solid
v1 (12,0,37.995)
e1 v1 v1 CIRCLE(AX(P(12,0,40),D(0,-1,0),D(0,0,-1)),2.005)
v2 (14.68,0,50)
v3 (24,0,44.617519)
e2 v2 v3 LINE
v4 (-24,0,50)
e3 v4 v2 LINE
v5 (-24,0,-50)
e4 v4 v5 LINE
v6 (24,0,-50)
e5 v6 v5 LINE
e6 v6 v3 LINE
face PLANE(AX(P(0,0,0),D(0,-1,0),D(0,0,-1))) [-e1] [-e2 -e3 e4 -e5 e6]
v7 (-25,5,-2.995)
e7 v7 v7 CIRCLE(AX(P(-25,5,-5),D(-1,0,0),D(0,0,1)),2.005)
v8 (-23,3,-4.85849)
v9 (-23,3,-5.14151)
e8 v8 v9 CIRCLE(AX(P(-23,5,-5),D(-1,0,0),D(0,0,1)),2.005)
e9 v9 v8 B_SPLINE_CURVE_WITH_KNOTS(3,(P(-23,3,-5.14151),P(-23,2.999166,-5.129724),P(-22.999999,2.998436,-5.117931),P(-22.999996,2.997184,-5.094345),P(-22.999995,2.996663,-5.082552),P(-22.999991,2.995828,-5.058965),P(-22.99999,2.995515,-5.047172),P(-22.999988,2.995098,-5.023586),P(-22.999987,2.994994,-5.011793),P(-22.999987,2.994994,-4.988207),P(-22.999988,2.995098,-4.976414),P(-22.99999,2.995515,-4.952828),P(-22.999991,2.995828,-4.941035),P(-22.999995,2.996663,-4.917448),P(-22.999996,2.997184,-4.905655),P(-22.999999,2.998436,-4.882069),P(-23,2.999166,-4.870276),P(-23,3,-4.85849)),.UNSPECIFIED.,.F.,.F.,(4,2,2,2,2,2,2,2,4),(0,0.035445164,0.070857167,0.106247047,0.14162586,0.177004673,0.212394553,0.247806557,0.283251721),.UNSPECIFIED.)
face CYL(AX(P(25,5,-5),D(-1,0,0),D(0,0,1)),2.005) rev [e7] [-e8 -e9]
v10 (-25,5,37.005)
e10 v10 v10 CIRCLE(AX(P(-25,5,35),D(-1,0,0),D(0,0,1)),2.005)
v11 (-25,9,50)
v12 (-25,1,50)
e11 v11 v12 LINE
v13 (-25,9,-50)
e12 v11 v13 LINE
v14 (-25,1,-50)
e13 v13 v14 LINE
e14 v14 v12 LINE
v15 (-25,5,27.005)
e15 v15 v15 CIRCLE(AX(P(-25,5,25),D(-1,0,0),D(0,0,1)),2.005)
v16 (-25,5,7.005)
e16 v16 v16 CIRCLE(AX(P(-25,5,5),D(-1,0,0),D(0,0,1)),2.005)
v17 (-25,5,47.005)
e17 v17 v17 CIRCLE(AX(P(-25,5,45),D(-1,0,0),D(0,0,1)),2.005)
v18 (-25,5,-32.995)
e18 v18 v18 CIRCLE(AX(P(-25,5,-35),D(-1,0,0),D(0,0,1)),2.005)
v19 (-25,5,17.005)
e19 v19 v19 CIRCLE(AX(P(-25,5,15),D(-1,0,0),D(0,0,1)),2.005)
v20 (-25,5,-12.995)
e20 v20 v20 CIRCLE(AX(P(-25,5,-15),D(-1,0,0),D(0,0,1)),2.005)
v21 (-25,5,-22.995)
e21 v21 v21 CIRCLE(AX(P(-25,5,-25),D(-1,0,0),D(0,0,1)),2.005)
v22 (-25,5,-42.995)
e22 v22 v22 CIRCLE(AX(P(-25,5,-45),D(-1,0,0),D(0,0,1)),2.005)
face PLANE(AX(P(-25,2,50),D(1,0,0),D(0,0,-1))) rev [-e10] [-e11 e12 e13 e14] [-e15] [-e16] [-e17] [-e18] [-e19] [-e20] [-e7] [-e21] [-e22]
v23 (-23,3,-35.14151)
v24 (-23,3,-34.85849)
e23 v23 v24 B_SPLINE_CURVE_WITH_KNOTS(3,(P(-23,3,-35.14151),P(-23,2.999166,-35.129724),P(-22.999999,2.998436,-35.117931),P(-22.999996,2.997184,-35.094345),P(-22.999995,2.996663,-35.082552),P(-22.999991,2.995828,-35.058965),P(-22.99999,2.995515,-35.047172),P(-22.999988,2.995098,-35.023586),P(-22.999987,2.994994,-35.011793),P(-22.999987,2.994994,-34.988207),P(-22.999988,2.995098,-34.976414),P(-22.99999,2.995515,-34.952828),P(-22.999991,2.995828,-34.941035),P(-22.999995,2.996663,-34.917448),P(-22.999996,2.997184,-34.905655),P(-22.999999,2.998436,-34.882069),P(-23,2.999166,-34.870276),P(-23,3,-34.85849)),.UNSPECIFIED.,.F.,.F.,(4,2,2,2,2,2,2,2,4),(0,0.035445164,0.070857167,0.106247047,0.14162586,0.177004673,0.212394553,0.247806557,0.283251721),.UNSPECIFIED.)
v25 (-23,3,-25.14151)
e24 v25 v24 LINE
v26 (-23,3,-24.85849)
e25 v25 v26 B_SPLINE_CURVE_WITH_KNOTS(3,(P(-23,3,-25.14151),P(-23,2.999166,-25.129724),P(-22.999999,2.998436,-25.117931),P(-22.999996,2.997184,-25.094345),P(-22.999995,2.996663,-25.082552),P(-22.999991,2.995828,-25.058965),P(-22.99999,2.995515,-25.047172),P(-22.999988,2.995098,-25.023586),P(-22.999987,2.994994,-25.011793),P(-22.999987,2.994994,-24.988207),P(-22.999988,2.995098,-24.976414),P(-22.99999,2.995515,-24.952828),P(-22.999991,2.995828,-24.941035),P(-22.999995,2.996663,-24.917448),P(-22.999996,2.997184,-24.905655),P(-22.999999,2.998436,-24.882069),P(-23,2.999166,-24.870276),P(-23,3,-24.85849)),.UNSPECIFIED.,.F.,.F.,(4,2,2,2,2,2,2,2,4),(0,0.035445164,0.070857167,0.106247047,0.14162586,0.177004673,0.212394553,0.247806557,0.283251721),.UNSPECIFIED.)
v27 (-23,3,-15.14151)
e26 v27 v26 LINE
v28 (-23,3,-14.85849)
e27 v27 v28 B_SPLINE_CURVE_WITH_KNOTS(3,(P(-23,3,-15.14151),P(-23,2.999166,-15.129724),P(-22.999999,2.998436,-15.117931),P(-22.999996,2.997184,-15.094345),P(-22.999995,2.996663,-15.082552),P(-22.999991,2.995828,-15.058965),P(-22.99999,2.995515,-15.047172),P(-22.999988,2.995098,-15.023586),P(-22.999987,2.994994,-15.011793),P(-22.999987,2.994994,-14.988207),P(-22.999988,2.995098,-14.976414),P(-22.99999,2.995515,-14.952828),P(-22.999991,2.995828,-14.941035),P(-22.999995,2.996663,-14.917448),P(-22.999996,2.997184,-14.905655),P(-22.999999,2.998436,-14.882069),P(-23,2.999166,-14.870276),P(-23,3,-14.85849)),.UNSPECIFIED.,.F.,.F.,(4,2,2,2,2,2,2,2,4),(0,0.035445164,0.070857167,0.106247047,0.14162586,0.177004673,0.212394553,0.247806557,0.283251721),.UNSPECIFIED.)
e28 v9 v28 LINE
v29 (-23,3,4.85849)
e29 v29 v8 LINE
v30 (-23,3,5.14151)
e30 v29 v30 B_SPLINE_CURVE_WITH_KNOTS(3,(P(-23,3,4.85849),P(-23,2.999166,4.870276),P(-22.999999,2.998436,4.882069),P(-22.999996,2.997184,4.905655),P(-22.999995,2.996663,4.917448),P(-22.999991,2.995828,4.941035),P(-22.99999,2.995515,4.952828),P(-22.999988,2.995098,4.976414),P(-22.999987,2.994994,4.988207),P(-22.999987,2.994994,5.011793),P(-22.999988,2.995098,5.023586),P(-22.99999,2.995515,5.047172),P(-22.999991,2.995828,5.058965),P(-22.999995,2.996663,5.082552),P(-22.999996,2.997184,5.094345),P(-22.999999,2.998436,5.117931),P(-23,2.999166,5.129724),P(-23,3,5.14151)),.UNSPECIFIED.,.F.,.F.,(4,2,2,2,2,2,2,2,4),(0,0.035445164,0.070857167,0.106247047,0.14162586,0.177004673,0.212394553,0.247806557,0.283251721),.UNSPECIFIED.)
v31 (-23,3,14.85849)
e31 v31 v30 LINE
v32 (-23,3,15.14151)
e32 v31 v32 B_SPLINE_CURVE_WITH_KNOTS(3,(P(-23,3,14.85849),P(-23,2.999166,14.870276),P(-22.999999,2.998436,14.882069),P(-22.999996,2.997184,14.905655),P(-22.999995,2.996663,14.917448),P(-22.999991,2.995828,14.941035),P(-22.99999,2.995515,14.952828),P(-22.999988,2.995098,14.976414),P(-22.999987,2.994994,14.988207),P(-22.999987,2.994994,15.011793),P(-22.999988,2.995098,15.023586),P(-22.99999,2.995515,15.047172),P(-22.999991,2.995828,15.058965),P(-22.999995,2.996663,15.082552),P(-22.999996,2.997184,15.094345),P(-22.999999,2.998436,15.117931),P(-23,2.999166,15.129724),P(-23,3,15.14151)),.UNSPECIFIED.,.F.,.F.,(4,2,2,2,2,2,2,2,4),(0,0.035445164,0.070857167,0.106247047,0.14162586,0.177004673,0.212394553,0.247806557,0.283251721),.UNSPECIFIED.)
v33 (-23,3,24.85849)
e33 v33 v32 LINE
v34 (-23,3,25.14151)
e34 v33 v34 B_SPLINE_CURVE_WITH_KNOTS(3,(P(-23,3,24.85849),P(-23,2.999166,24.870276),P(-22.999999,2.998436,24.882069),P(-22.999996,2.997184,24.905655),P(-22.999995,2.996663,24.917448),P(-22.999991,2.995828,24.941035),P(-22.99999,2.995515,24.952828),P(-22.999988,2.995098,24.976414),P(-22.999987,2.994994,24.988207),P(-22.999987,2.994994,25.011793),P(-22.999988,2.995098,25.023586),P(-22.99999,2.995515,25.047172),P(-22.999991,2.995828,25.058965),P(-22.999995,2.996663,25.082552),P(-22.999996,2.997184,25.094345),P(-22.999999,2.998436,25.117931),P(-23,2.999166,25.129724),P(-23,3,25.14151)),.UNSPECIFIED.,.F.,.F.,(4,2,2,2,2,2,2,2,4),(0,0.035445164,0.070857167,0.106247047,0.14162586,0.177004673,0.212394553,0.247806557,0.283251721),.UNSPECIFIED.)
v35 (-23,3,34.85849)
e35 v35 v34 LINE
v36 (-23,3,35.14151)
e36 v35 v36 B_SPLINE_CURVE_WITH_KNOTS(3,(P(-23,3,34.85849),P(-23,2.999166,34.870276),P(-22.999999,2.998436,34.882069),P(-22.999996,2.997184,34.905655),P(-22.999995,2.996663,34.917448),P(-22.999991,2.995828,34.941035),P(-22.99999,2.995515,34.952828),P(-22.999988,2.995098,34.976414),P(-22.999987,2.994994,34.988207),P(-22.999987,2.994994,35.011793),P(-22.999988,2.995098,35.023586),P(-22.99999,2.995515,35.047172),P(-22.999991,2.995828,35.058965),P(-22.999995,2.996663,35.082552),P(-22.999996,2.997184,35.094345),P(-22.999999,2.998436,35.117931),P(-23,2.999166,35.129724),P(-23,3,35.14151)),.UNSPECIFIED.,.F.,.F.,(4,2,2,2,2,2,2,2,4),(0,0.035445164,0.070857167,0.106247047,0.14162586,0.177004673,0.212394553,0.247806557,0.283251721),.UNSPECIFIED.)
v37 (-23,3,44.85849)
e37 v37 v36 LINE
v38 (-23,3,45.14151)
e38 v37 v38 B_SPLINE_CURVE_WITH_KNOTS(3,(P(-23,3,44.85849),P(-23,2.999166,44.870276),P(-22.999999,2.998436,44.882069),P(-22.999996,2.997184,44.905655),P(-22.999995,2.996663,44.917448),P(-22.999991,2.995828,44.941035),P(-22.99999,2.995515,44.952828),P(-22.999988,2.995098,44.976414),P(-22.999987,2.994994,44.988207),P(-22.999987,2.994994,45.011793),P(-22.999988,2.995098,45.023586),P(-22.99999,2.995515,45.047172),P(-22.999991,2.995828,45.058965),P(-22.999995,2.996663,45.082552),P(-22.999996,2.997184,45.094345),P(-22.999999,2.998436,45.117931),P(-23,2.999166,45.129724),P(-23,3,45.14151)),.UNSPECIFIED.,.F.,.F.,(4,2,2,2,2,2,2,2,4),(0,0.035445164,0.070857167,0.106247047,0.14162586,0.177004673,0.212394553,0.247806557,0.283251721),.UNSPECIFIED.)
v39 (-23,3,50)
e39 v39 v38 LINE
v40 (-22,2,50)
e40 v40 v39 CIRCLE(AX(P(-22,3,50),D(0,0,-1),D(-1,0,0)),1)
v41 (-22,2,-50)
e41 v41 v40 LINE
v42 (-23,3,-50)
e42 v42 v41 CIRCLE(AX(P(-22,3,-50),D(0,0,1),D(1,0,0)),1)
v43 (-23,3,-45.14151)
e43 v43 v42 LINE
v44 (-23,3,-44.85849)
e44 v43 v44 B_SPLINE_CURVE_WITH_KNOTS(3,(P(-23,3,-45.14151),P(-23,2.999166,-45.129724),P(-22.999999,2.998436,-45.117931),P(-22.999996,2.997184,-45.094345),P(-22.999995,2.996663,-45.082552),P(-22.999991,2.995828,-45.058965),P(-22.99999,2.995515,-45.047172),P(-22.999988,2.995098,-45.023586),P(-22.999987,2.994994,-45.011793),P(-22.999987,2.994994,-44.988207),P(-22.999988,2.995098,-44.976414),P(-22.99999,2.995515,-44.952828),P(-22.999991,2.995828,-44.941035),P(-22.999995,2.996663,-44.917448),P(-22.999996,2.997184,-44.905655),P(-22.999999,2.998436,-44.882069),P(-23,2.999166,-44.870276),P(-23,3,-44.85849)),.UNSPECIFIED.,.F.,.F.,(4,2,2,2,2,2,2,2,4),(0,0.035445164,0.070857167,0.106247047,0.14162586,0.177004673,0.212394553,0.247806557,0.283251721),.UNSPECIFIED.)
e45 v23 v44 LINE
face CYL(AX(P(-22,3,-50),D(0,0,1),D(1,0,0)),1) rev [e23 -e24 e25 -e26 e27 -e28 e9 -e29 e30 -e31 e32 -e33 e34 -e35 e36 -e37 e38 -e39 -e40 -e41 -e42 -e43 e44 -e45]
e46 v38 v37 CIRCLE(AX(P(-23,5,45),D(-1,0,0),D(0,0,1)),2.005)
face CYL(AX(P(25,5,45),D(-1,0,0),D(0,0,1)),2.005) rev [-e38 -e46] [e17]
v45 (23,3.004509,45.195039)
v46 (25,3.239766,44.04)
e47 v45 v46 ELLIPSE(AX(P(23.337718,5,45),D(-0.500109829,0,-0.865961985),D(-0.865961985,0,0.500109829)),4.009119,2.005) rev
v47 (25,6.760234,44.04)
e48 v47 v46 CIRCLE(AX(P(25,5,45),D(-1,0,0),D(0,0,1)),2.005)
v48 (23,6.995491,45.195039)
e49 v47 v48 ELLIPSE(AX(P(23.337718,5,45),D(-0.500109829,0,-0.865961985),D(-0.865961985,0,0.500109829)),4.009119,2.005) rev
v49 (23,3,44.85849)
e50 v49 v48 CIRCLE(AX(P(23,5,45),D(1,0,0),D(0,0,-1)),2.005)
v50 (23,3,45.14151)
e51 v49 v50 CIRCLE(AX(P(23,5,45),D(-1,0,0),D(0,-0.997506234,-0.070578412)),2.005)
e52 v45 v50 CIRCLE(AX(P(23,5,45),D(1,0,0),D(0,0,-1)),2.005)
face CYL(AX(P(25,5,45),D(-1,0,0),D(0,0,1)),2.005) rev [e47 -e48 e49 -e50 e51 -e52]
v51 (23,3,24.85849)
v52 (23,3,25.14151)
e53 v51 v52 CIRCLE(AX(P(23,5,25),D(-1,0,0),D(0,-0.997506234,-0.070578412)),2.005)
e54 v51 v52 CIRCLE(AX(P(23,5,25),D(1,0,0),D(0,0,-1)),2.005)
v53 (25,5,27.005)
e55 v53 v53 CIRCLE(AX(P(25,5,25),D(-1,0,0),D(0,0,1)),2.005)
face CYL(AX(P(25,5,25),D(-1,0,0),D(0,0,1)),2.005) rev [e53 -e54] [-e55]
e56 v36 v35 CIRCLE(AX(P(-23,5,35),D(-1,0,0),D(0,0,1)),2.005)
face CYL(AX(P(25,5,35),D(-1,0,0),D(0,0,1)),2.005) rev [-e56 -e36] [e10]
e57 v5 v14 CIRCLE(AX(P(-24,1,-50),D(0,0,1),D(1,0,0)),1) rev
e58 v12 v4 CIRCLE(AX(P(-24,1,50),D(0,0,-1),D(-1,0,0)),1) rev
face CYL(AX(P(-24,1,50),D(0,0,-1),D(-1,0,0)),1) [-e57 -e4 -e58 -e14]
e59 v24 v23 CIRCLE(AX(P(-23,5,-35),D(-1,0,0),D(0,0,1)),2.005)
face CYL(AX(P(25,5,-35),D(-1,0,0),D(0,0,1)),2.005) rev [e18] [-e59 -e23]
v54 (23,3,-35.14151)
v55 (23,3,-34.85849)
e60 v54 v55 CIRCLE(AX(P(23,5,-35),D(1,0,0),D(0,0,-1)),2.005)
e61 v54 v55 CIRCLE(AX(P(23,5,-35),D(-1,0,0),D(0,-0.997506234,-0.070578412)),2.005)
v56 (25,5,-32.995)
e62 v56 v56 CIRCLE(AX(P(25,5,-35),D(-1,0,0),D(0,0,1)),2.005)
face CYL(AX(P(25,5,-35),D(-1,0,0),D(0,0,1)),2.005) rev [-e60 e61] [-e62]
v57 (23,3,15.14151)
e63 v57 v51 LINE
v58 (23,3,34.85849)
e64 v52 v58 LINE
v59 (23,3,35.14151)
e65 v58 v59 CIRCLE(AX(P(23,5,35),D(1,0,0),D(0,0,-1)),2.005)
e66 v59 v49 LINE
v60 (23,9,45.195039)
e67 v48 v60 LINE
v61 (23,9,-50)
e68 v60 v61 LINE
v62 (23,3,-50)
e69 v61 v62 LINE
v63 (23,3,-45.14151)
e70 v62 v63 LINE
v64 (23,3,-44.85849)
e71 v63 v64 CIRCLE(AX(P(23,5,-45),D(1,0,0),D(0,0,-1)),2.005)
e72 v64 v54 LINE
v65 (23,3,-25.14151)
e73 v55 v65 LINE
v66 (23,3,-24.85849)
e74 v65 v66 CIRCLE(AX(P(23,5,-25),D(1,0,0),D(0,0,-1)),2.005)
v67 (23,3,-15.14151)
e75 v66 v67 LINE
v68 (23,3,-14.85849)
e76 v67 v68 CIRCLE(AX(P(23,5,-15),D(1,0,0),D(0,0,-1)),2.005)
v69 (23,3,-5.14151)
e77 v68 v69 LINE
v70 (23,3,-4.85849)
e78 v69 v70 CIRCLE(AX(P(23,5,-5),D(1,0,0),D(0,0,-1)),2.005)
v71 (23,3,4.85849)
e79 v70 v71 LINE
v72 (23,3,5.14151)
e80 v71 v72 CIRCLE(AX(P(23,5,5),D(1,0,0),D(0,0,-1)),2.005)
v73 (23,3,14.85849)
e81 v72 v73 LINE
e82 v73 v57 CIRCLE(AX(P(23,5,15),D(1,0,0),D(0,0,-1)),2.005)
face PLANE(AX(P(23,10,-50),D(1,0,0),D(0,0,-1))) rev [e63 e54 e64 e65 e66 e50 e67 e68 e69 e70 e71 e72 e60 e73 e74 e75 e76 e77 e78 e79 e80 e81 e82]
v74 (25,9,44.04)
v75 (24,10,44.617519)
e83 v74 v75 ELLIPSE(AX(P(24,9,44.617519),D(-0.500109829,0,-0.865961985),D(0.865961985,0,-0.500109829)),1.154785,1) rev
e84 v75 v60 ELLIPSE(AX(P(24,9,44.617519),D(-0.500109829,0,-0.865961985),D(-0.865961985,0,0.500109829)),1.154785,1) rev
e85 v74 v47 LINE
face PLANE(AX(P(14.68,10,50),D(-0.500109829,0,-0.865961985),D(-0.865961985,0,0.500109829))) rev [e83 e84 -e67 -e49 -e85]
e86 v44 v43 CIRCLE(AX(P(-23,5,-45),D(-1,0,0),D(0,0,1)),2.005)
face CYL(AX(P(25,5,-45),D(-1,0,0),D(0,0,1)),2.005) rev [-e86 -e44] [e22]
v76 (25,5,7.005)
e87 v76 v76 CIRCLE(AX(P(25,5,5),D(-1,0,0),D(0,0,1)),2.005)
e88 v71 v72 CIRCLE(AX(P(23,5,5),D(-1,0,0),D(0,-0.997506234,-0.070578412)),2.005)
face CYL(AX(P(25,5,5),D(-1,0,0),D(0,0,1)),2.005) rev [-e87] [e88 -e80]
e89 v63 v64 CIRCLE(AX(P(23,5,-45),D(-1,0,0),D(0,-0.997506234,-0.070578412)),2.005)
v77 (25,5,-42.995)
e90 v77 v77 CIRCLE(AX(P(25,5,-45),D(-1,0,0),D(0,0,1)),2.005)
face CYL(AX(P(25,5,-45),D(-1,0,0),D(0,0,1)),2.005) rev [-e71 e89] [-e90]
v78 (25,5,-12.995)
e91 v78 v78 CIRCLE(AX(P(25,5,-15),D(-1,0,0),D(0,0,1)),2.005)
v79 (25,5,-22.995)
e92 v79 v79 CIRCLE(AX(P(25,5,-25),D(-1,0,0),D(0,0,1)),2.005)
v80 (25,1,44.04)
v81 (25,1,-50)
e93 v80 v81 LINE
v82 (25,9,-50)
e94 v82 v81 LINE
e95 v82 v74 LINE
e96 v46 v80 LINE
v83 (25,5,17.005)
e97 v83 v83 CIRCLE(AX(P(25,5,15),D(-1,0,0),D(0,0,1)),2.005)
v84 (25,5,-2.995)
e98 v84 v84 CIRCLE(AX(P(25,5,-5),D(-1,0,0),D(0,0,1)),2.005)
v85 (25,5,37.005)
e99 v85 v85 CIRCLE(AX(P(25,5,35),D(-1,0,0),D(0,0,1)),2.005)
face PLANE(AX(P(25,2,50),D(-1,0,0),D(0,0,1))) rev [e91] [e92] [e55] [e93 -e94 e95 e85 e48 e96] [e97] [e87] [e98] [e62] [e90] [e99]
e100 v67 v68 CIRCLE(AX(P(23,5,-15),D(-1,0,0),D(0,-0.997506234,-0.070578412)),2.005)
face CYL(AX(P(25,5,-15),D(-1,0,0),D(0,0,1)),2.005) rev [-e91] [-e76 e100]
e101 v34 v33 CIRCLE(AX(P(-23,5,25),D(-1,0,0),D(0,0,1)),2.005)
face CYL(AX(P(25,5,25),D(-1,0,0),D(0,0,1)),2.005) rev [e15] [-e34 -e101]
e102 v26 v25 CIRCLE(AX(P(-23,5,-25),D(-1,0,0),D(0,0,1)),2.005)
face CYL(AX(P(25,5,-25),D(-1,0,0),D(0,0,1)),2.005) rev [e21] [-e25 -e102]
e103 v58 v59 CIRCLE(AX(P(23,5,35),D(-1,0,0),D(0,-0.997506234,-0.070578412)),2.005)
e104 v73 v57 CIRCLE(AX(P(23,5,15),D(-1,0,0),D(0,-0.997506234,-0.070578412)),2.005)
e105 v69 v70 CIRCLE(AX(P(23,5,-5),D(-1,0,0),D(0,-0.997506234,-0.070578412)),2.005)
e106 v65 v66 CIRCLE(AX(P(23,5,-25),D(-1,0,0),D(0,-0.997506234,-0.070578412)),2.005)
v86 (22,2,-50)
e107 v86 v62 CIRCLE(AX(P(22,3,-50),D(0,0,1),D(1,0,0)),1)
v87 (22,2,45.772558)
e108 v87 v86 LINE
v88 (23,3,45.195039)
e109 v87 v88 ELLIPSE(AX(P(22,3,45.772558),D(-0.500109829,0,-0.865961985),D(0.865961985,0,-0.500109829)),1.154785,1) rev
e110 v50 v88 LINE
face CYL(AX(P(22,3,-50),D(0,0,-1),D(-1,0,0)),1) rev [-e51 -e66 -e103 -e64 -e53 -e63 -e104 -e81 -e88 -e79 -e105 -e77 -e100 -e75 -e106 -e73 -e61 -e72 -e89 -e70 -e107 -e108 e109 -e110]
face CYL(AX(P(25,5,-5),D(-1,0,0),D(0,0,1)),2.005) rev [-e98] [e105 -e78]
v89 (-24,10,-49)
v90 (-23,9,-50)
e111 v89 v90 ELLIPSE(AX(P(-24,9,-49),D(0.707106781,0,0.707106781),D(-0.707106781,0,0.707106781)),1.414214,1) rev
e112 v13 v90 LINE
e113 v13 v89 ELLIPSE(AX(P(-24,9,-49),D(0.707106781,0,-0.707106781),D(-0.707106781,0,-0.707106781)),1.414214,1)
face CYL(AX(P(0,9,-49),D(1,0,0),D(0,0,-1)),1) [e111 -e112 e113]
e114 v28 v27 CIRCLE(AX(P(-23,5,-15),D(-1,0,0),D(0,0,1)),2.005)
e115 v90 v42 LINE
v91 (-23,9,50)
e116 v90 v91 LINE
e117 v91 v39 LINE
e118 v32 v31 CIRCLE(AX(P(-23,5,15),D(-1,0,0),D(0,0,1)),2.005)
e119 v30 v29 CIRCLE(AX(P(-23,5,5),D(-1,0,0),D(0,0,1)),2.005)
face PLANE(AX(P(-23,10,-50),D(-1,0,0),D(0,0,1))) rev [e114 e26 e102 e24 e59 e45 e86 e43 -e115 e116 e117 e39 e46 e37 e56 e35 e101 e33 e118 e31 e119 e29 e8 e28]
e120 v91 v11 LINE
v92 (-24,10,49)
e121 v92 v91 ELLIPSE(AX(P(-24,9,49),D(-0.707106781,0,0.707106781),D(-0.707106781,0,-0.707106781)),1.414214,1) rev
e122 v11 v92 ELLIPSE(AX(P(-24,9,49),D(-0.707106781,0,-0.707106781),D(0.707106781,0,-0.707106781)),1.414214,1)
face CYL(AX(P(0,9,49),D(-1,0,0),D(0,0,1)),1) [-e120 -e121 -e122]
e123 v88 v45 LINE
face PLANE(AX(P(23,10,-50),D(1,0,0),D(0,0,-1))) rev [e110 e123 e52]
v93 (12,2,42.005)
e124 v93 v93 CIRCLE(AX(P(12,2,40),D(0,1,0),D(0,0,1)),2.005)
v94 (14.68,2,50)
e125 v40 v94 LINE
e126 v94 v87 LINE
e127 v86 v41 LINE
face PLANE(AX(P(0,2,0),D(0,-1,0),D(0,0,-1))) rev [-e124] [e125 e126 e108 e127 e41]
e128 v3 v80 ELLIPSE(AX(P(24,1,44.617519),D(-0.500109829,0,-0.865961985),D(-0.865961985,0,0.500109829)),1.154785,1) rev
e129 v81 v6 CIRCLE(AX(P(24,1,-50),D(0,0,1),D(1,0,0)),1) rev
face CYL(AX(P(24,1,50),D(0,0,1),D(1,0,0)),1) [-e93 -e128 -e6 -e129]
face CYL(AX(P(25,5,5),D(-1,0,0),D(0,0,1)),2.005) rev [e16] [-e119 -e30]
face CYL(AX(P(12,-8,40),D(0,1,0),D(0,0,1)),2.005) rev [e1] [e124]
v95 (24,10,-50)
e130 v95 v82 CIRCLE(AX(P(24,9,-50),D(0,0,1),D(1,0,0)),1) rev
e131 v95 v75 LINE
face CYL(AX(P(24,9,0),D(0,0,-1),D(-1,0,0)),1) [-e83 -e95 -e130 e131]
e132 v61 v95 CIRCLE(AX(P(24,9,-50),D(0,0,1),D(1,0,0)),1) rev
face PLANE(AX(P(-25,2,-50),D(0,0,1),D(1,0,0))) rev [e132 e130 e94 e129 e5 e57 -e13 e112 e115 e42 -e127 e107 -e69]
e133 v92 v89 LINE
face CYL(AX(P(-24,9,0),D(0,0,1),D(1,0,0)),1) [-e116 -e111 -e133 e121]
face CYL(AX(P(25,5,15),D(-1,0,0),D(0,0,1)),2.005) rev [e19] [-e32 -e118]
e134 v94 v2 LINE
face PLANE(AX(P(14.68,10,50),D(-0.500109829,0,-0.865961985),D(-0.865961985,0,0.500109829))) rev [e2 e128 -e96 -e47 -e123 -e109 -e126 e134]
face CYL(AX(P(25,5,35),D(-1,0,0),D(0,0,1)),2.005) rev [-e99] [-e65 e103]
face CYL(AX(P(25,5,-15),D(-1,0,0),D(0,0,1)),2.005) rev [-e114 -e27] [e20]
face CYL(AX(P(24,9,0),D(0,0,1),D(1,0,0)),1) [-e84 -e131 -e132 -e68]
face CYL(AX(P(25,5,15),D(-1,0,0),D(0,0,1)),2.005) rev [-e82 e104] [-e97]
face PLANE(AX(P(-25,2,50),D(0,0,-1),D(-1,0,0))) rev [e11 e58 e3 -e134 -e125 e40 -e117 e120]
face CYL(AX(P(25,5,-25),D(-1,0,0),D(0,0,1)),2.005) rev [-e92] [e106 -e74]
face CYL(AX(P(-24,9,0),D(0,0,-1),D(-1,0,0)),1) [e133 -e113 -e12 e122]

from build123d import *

# Parameters (mm, degrees)
SKETCH1_W           = 50
SKETCH1_H           = 100
BOSS_EXTRUDE1_DEPTH = 2
SKETCH2_W           = 2
SKETCH2_H           = 100
BOSS_EXTRUDE2_DEPTH = 8
FILLET1_R           = 1
SKETCH3_R           = 2.005
CUT_EXTRUDE1_DEPTH  = 72.414284285
SKETCH4_R           = 2.005
CUT_EXTRUDE2_DEPTH  = 10
CUT_EXTRUDE3_DEPTH  = 57.78908359


with BuildPart() as part:
    # Sketch1 → Boss-Extrude1 (new body)
    with BuildSketch(Plane(origin=(0, 0, 0), x_dir=(1, 0, 0), z_dir=(0, 1, 0))):
        Rectangle(SKETCH1_W, SKETCH1_H)
    extrude(amount=BOSS_EXTRUDE1_DEPTH)

    # Sketch2 → Boss-Extrude2 (add)
    with BuildSketch(Plane(origin=(0, 2, 0), x_dir=(1, 0, 0), z_dir=(0, 1, 0))):
        with Locations((-24, 0)):
            Rectangle(SKETCH2_W, SKETCH2_H)
        with Locations((24, 0)):
            Rectangle(SKETCH2_W, SKETCH2_H)
    extrude(amount=BOSS_EXTRUDE2_DEPTH)

    # Fillet1
    fillet1_edges = [part.edges().sort_by_distance(p)[0] for p in [
        (-24, 10, -50),
        (-23, 10, 0),
        (-24, 10, 50),
        (-25, 10, 0),
        (25, 0, 0),
        (-25, 0, 0),
        (25, 10, 0),
        (23, 10, 0),
        (-23, 2, 0),
        (23, 2, 0),
    ]]
    fillet(fillet1_edges, radius=FILLET1_R - 0.0001)  # a hair under: the kernel refuses the full size

    # Sketch3 → Cut-Extrude1 (cut, through all)
    with BuildSketch(Plane.ZY.offset(25)):
        with Locations((-45, 5)):
            Circle(SKETCH3_R)
        with Locations((-35, 5)):
            Circle(SKETCH3_R)
        with Locations((-25, 5)):
            Circle(SKETCH3_R)
        with Locations((-15, 5)):
            Circle(SKETCH3_R)
        with Locations((-5, 5)):
            Circle(SKETCH3_R)
        with Locations((5, 5)):
            Circle(SKETCH3_R)
        with Locations((15, 5)):
            Circle(SKETCH3_R)
        with Locations((25, 5)):
            Circle(SKETCH3_R)
        with Locations((35, 5)):
            Circle(SKETCH3_R)
        with Locations((45, 5)):
            Circle(SKETCH3_R)
    extrude(amount=-CUT_EXTRUDE1_DEPTH, mode=Mode.SUBTRACT)

    # Sketch4 → Cut-Extrude2 (cut)
    with BuildSketch(Plane(origin=(0, 2, 0), x_dir=(1, 0, 0), z_dir=(0, 1, 0))):
        with Locations(Location((12, -40, 0), (0, 0, 270))):
            Circle(SKETCH4_R)
    extrude(amount=-CUT_EXTRUDE2_DEPTH, mode=Mode.SUBTRACT)

    # Sketch5 → Cut-Extrude3 (cut, through all)
    with BuildSketch(Plane.XZ):
        Polygon((25, 50), (14.68, 50), (25, 44.04), align=None)
    extrude(amount=-CUT_EXTRUDE3_DEPTH, mode=Mode.SUBTRACT)


solid = part.part
